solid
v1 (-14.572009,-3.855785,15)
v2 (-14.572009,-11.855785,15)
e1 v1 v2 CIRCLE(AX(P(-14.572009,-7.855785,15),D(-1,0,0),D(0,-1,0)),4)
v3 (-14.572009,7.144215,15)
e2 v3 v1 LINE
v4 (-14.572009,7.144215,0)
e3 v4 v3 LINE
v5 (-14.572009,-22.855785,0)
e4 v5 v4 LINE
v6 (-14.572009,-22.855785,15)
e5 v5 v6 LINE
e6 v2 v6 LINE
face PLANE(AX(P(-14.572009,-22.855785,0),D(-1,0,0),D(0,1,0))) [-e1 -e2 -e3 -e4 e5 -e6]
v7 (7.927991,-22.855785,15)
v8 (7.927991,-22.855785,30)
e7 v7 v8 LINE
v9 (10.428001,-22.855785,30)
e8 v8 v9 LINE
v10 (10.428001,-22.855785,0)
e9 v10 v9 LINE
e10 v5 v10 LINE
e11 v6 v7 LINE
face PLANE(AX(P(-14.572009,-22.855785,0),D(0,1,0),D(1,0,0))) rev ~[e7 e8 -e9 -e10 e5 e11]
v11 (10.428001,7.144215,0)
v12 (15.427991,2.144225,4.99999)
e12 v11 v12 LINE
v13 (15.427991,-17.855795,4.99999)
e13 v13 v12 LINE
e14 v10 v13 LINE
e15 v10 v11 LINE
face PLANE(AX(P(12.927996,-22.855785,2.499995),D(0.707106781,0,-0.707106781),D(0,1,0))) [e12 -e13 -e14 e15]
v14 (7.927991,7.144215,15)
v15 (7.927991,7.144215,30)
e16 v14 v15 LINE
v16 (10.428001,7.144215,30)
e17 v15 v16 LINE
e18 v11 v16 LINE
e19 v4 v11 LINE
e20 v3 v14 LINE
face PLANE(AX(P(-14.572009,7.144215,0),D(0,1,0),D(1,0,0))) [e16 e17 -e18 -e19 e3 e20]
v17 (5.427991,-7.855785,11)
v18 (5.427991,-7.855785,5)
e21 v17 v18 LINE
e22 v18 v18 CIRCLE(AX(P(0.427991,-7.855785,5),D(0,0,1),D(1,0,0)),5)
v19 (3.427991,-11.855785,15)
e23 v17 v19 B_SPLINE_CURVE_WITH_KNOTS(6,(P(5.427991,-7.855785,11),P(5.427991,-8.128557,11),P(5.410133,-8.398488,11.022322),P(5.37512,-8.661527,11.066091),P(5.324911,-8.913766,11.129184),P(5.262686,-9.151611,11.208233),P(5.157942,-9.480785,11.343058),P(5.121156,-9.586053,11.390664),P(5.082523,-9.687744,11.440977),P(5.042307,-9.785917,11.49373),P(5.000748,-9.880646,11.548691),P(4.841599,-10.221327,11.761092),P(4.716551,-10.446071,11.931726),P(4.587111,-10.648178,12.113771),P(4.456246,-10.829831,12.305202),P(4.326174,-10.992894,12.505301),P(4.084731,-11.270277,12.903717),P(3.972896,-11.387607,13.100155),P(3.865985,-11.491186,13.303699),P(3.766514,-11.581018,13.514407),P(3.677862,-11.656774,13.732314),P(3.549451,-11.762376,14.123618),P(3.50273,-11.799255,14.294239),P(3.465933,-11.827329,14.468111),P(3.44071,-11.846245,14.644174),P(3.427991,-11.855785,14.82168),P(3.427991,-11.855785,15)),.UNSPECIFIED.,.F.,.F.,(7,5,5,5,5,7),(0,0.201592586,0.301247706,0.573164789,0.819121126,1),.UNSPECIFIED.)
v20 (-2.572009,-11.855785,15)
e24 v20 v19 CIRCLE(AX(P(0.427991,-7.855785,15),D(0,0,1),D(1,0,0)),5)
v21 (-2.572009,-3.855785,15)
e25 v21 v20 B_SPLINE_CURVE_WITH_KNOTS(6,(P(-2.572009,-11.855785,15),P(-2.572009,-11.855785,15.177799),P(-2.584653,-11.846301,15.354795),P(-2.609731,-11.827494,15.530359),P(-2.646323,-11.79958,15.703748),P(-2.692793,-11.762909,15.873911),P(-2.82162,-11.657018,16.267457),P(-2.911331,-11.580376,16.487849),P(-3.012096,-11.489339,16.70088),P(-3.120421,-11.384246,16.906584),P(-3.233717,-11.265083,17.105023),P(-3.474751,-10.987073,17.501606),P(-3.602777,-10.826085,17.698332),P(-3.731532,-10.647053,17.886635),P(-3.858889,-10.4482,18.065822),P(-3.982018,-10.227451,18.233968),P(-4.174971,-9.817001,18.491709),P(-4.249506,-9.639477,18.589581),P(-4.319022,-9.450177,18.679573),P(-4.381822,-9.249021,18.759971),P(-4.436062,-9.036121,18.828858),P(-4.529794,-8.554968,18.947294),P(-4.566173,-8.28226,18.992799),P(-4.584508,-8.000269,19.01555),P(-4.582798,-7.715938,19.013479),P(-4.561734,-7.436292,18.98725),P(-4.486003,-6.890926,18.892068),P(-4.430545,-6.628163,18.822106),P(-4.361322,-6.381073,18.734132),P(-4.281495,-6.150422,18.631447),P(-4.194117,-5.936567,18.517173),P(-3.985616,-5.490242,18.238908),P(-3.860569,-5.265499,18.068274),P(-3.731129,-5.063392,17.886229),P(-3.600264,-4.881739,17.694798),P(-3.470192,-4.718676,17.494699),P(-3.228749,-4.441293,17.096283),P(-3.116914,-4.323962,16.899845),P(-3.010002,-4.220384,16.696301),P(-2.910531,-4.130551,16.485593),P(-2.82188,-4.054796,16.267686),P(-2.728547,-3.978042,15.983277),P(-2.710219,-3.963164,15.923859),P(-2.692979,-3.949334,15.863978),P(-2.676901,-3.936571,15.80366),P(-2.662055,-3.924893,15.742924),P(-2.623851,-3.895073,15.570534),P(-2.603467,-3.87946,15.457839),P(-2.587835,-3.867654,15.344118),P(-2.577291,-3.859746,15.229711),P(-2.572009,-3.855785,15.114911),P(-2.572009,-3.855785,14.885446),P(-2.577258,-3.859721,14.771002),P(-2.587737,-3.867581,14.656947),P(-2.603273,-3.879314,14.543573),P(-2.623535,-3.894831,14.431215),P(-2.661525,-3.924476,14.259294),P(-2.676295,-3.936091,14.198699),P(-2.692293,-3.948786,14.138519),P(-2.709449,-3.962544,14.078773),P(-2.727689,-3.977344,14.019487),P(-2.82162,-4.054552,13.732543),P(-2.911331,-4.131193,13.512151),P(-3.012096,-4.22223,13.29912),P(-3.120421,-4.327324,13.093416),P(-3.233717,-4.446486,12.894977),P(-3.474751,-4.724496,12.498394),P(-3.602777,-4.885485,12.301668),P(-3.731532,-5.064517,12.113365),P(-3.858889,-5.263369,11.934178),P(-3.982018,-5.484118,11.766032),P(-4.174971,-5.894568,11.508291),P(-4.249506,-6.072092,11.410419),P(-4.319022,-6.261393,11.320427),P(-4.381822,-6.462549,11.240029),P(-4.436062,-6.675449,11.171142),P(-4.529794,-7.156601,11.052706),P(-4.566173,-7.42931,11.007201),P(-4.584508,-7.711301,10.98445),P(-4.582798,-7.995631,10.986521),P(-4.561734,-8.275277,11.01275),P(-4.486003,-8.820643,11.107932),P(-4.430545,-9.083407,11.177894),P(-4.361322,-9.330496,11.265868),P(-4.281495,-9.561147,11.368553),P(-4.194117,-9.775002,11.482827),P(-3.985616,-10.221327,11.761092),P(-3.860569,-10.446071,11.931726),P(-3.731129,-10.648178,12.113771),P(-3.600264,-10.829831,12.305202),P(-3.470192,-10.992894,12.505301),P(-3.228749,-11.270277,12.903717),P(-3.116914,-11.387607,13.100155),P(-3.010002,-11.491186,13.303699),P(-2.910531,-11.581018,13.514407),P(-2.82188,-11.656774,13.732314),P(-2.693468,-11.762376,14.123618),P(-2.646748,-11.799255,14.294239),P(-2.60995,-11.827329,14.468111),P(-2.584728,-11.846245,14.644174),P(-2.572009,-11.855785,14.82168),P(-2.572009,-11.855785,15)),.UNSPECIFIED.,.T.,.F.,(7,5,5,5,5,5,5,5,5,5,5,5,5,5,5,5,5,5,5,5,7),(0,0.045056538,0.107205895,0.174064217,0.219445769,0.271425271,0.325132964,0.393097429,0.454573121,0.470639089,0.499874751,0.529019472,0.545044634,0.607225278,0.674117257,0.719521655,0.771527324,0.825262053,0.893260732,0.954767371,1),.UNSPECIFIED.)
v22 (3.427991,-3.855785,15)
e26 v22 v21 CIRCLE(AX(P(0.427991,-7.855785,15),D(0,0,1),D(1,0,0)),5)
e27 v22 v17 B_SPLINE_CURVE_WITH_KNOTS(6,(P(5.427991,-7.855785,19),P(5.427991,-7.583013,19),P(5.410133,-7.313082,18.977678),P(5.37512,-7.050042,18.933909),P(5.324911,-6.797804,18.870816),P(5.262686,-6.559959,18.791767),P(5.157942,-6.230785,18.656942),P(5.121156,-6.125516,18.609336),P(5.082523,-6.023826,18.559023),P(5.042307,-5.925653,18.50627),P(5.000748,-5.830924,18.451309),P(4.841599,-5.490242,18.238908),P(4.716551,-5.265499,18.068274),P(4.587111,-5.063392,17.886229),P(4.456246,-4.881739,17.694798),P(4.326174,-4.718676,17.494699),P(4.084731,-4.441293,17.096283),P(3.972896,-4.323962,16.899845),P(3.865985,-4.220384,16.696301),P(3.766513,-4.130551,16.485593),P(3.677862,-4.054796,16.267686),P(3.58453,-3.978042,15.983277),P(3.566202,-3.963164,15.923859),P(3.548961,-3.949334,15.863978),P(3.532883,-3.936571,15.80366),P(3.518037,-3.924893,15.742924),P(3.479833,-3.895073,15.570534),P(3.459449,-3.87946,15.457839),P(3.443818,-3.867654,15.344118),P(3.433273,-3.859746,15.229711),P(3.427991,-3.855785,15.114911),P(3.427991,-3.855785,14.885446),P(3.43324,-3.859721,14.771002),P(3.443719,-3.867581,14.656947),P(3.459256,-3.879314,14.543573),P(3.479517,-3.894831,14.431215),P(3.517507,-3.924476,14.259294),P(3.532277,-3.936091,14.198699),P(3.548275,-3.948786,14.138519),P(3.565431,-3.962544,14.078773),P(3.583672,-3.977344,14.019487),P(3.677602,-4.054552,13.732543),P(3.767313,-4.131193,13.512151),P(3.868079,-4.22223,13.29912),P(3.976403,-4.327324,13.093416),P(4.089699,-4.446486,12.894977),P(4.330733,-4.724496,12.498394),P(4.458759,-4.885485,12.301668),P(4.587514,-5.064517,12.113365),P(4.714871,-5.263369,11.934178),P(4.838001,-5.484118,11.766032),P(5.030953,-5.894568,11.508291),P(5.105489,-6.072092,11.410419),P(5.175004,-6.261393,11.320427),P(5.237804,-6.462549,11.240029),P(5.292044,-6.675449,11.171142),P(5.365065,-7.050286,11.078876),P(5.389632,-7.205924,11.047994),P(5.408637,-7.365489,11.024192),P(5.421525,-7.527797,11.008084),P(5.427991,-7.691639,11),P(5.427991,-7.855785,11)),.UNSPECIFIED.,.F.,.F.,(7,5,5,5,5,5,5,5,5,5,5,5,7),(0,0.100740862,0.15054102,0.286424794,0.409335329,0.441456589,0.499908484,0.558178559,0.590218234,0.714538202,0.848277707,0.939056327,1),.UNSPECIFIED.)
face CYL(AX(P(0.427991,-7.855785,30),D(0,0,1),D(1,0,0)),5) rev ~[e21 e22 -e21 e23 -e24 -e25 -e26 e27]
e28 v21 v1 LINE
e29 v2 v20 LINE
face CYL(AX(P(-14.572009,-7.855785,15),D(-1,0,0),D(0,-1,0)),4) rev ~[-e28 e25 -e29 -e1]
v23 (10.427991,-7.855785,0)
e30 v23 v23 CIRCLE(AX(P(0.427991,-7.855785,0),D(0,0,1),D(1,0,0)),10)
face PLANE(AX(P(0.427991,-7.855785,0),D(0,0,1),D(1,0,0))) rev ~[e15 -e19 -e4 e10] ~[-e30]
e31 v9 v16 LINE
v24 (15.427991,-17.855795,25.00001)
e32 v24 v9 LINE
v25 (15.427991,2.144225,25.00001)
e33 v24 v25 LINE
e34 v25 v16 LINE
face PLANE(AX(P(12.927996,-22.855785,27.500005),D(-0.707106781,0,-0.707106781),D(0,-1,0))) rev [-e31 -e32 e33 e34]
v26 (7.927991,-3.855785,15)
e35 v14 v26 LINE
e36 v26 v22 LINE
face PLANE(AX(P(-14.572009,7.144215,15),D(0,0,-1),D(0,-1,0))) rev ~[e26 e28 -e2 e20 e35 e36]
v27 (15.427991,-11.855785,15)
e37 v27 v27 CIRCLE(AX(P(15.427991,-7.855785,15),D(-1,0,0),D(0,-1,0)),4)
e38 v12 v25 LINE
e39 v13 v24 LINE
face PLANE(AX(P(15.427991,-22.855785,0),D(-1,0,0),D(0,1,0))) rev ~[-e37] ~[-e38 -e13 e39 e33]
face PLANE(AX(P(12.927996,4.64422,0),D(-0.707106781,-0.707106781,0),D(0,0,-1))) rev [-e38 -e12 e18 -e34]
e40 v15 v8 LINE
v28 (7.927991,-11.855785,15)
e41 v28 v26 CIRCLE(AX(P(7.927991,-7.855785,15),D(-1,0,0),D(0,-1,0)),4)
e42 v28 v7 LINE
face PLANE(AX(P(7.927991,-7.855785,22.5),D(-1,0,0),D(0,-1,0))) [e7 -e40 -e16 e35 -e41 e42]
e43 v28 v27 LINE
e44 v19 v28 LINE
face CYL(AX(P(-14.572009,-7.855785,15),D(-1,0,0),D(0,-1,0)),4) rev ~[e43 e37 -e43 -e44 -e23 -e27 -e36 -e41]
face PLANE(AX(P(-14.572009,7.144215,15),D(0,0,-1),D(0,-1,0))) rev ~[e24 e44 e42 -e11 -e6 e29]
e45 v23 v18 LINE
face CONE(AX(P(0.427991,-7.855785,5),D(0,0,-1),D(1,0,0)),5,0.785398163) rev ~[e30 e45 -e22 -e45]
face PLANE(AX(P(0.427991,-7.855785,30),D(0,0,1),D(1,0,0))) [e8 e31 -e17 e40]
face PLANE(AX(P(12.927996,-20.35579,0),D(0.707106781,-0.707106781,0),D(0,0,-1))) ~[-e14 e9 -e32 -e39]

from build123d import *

# Parameters (mm, degrees)
F0_W     = 30
F0_H     = 30
F1_DEPTH = 30
F2_R     = 4
F3_DEPTH = 30.001
F4_R     = 5
F5_DEPTH = 30.001
F6_W     = 30
F6_H     = 15
F7_DEPTH = 22.5
F8_SIZE  = 5
F9_SIZE  = 4.99999


# Not quite as in the source:
# - a fillet or chamfer is up to 0.001 mm smaller than in the source, because OpenCascade refuses the exact size


with BuildPart() as f1:
    # F0 (on Top) → F1 (new body)
    with BuildSketch(Plane.XY):
        with Locations((0.4279911518, -7.855784721)):
            Rectangle(F0_W, F0_H)
    extrude(amount=F1_DEPTH)

    # F2 (on face) → F3 (cut, through all)
    with BuildSketch(Plane(origin=(-14.5720088482, 0, 0), x_dir=(0, -1, 0), z_dir=(-1, 0, 0))):
        with Locations((7.855784721, 15)):
            Circle(F2_R)
    extrude(amount=-F3_DEPTH, mode=Mode.SUBTRACT)

    # F4 (on face) → F5 (cut, through all)
    with BuildSketch(Plane.XY.offset(30)):
        with Locations((0.4279911518, -7.855784721)):
            Circle(F4_R)
    extrude(amount=-F5_DEPTH, mode=Mode.SUBTRACT)

    # F6 (on face) → F7 (cut)
    with BuildSketch(Plane(origin=(-14.5720088482, 0, 0), x_dir=(0, -1, 0), z_dir=(-1, 0, 0))):
        with Locations((7.855784721, 22.5)):
            Rectangle(F6_W, F6_H)
    extrude(amount=-F7_DEPTH, mode=Mode.SUBTRACT)

    # F8
    f8_edges = [f1.edges().sort_by_distance(p)[0] for p in [
        (-4.572009, -7.855785, 0),
    ]]
    chamfer(f8_edges, length=F8_SIZE)

    # F9 (size 5 in the source; OpenCascade refuses exactly that, so slightly less here)
    f9_edges = [f1.edges().sort_by_distance(p)[0] for p in [
        (15.427991, -7.855785, 30),
        (15.427991, -22.855785, 15),
        (15.427991, 7.144215, 15),
        (15.427991, -7.855785, 0),
    ]]
    chamfer(f9_edges, length=F9_SIZE)


solid = f1.part
